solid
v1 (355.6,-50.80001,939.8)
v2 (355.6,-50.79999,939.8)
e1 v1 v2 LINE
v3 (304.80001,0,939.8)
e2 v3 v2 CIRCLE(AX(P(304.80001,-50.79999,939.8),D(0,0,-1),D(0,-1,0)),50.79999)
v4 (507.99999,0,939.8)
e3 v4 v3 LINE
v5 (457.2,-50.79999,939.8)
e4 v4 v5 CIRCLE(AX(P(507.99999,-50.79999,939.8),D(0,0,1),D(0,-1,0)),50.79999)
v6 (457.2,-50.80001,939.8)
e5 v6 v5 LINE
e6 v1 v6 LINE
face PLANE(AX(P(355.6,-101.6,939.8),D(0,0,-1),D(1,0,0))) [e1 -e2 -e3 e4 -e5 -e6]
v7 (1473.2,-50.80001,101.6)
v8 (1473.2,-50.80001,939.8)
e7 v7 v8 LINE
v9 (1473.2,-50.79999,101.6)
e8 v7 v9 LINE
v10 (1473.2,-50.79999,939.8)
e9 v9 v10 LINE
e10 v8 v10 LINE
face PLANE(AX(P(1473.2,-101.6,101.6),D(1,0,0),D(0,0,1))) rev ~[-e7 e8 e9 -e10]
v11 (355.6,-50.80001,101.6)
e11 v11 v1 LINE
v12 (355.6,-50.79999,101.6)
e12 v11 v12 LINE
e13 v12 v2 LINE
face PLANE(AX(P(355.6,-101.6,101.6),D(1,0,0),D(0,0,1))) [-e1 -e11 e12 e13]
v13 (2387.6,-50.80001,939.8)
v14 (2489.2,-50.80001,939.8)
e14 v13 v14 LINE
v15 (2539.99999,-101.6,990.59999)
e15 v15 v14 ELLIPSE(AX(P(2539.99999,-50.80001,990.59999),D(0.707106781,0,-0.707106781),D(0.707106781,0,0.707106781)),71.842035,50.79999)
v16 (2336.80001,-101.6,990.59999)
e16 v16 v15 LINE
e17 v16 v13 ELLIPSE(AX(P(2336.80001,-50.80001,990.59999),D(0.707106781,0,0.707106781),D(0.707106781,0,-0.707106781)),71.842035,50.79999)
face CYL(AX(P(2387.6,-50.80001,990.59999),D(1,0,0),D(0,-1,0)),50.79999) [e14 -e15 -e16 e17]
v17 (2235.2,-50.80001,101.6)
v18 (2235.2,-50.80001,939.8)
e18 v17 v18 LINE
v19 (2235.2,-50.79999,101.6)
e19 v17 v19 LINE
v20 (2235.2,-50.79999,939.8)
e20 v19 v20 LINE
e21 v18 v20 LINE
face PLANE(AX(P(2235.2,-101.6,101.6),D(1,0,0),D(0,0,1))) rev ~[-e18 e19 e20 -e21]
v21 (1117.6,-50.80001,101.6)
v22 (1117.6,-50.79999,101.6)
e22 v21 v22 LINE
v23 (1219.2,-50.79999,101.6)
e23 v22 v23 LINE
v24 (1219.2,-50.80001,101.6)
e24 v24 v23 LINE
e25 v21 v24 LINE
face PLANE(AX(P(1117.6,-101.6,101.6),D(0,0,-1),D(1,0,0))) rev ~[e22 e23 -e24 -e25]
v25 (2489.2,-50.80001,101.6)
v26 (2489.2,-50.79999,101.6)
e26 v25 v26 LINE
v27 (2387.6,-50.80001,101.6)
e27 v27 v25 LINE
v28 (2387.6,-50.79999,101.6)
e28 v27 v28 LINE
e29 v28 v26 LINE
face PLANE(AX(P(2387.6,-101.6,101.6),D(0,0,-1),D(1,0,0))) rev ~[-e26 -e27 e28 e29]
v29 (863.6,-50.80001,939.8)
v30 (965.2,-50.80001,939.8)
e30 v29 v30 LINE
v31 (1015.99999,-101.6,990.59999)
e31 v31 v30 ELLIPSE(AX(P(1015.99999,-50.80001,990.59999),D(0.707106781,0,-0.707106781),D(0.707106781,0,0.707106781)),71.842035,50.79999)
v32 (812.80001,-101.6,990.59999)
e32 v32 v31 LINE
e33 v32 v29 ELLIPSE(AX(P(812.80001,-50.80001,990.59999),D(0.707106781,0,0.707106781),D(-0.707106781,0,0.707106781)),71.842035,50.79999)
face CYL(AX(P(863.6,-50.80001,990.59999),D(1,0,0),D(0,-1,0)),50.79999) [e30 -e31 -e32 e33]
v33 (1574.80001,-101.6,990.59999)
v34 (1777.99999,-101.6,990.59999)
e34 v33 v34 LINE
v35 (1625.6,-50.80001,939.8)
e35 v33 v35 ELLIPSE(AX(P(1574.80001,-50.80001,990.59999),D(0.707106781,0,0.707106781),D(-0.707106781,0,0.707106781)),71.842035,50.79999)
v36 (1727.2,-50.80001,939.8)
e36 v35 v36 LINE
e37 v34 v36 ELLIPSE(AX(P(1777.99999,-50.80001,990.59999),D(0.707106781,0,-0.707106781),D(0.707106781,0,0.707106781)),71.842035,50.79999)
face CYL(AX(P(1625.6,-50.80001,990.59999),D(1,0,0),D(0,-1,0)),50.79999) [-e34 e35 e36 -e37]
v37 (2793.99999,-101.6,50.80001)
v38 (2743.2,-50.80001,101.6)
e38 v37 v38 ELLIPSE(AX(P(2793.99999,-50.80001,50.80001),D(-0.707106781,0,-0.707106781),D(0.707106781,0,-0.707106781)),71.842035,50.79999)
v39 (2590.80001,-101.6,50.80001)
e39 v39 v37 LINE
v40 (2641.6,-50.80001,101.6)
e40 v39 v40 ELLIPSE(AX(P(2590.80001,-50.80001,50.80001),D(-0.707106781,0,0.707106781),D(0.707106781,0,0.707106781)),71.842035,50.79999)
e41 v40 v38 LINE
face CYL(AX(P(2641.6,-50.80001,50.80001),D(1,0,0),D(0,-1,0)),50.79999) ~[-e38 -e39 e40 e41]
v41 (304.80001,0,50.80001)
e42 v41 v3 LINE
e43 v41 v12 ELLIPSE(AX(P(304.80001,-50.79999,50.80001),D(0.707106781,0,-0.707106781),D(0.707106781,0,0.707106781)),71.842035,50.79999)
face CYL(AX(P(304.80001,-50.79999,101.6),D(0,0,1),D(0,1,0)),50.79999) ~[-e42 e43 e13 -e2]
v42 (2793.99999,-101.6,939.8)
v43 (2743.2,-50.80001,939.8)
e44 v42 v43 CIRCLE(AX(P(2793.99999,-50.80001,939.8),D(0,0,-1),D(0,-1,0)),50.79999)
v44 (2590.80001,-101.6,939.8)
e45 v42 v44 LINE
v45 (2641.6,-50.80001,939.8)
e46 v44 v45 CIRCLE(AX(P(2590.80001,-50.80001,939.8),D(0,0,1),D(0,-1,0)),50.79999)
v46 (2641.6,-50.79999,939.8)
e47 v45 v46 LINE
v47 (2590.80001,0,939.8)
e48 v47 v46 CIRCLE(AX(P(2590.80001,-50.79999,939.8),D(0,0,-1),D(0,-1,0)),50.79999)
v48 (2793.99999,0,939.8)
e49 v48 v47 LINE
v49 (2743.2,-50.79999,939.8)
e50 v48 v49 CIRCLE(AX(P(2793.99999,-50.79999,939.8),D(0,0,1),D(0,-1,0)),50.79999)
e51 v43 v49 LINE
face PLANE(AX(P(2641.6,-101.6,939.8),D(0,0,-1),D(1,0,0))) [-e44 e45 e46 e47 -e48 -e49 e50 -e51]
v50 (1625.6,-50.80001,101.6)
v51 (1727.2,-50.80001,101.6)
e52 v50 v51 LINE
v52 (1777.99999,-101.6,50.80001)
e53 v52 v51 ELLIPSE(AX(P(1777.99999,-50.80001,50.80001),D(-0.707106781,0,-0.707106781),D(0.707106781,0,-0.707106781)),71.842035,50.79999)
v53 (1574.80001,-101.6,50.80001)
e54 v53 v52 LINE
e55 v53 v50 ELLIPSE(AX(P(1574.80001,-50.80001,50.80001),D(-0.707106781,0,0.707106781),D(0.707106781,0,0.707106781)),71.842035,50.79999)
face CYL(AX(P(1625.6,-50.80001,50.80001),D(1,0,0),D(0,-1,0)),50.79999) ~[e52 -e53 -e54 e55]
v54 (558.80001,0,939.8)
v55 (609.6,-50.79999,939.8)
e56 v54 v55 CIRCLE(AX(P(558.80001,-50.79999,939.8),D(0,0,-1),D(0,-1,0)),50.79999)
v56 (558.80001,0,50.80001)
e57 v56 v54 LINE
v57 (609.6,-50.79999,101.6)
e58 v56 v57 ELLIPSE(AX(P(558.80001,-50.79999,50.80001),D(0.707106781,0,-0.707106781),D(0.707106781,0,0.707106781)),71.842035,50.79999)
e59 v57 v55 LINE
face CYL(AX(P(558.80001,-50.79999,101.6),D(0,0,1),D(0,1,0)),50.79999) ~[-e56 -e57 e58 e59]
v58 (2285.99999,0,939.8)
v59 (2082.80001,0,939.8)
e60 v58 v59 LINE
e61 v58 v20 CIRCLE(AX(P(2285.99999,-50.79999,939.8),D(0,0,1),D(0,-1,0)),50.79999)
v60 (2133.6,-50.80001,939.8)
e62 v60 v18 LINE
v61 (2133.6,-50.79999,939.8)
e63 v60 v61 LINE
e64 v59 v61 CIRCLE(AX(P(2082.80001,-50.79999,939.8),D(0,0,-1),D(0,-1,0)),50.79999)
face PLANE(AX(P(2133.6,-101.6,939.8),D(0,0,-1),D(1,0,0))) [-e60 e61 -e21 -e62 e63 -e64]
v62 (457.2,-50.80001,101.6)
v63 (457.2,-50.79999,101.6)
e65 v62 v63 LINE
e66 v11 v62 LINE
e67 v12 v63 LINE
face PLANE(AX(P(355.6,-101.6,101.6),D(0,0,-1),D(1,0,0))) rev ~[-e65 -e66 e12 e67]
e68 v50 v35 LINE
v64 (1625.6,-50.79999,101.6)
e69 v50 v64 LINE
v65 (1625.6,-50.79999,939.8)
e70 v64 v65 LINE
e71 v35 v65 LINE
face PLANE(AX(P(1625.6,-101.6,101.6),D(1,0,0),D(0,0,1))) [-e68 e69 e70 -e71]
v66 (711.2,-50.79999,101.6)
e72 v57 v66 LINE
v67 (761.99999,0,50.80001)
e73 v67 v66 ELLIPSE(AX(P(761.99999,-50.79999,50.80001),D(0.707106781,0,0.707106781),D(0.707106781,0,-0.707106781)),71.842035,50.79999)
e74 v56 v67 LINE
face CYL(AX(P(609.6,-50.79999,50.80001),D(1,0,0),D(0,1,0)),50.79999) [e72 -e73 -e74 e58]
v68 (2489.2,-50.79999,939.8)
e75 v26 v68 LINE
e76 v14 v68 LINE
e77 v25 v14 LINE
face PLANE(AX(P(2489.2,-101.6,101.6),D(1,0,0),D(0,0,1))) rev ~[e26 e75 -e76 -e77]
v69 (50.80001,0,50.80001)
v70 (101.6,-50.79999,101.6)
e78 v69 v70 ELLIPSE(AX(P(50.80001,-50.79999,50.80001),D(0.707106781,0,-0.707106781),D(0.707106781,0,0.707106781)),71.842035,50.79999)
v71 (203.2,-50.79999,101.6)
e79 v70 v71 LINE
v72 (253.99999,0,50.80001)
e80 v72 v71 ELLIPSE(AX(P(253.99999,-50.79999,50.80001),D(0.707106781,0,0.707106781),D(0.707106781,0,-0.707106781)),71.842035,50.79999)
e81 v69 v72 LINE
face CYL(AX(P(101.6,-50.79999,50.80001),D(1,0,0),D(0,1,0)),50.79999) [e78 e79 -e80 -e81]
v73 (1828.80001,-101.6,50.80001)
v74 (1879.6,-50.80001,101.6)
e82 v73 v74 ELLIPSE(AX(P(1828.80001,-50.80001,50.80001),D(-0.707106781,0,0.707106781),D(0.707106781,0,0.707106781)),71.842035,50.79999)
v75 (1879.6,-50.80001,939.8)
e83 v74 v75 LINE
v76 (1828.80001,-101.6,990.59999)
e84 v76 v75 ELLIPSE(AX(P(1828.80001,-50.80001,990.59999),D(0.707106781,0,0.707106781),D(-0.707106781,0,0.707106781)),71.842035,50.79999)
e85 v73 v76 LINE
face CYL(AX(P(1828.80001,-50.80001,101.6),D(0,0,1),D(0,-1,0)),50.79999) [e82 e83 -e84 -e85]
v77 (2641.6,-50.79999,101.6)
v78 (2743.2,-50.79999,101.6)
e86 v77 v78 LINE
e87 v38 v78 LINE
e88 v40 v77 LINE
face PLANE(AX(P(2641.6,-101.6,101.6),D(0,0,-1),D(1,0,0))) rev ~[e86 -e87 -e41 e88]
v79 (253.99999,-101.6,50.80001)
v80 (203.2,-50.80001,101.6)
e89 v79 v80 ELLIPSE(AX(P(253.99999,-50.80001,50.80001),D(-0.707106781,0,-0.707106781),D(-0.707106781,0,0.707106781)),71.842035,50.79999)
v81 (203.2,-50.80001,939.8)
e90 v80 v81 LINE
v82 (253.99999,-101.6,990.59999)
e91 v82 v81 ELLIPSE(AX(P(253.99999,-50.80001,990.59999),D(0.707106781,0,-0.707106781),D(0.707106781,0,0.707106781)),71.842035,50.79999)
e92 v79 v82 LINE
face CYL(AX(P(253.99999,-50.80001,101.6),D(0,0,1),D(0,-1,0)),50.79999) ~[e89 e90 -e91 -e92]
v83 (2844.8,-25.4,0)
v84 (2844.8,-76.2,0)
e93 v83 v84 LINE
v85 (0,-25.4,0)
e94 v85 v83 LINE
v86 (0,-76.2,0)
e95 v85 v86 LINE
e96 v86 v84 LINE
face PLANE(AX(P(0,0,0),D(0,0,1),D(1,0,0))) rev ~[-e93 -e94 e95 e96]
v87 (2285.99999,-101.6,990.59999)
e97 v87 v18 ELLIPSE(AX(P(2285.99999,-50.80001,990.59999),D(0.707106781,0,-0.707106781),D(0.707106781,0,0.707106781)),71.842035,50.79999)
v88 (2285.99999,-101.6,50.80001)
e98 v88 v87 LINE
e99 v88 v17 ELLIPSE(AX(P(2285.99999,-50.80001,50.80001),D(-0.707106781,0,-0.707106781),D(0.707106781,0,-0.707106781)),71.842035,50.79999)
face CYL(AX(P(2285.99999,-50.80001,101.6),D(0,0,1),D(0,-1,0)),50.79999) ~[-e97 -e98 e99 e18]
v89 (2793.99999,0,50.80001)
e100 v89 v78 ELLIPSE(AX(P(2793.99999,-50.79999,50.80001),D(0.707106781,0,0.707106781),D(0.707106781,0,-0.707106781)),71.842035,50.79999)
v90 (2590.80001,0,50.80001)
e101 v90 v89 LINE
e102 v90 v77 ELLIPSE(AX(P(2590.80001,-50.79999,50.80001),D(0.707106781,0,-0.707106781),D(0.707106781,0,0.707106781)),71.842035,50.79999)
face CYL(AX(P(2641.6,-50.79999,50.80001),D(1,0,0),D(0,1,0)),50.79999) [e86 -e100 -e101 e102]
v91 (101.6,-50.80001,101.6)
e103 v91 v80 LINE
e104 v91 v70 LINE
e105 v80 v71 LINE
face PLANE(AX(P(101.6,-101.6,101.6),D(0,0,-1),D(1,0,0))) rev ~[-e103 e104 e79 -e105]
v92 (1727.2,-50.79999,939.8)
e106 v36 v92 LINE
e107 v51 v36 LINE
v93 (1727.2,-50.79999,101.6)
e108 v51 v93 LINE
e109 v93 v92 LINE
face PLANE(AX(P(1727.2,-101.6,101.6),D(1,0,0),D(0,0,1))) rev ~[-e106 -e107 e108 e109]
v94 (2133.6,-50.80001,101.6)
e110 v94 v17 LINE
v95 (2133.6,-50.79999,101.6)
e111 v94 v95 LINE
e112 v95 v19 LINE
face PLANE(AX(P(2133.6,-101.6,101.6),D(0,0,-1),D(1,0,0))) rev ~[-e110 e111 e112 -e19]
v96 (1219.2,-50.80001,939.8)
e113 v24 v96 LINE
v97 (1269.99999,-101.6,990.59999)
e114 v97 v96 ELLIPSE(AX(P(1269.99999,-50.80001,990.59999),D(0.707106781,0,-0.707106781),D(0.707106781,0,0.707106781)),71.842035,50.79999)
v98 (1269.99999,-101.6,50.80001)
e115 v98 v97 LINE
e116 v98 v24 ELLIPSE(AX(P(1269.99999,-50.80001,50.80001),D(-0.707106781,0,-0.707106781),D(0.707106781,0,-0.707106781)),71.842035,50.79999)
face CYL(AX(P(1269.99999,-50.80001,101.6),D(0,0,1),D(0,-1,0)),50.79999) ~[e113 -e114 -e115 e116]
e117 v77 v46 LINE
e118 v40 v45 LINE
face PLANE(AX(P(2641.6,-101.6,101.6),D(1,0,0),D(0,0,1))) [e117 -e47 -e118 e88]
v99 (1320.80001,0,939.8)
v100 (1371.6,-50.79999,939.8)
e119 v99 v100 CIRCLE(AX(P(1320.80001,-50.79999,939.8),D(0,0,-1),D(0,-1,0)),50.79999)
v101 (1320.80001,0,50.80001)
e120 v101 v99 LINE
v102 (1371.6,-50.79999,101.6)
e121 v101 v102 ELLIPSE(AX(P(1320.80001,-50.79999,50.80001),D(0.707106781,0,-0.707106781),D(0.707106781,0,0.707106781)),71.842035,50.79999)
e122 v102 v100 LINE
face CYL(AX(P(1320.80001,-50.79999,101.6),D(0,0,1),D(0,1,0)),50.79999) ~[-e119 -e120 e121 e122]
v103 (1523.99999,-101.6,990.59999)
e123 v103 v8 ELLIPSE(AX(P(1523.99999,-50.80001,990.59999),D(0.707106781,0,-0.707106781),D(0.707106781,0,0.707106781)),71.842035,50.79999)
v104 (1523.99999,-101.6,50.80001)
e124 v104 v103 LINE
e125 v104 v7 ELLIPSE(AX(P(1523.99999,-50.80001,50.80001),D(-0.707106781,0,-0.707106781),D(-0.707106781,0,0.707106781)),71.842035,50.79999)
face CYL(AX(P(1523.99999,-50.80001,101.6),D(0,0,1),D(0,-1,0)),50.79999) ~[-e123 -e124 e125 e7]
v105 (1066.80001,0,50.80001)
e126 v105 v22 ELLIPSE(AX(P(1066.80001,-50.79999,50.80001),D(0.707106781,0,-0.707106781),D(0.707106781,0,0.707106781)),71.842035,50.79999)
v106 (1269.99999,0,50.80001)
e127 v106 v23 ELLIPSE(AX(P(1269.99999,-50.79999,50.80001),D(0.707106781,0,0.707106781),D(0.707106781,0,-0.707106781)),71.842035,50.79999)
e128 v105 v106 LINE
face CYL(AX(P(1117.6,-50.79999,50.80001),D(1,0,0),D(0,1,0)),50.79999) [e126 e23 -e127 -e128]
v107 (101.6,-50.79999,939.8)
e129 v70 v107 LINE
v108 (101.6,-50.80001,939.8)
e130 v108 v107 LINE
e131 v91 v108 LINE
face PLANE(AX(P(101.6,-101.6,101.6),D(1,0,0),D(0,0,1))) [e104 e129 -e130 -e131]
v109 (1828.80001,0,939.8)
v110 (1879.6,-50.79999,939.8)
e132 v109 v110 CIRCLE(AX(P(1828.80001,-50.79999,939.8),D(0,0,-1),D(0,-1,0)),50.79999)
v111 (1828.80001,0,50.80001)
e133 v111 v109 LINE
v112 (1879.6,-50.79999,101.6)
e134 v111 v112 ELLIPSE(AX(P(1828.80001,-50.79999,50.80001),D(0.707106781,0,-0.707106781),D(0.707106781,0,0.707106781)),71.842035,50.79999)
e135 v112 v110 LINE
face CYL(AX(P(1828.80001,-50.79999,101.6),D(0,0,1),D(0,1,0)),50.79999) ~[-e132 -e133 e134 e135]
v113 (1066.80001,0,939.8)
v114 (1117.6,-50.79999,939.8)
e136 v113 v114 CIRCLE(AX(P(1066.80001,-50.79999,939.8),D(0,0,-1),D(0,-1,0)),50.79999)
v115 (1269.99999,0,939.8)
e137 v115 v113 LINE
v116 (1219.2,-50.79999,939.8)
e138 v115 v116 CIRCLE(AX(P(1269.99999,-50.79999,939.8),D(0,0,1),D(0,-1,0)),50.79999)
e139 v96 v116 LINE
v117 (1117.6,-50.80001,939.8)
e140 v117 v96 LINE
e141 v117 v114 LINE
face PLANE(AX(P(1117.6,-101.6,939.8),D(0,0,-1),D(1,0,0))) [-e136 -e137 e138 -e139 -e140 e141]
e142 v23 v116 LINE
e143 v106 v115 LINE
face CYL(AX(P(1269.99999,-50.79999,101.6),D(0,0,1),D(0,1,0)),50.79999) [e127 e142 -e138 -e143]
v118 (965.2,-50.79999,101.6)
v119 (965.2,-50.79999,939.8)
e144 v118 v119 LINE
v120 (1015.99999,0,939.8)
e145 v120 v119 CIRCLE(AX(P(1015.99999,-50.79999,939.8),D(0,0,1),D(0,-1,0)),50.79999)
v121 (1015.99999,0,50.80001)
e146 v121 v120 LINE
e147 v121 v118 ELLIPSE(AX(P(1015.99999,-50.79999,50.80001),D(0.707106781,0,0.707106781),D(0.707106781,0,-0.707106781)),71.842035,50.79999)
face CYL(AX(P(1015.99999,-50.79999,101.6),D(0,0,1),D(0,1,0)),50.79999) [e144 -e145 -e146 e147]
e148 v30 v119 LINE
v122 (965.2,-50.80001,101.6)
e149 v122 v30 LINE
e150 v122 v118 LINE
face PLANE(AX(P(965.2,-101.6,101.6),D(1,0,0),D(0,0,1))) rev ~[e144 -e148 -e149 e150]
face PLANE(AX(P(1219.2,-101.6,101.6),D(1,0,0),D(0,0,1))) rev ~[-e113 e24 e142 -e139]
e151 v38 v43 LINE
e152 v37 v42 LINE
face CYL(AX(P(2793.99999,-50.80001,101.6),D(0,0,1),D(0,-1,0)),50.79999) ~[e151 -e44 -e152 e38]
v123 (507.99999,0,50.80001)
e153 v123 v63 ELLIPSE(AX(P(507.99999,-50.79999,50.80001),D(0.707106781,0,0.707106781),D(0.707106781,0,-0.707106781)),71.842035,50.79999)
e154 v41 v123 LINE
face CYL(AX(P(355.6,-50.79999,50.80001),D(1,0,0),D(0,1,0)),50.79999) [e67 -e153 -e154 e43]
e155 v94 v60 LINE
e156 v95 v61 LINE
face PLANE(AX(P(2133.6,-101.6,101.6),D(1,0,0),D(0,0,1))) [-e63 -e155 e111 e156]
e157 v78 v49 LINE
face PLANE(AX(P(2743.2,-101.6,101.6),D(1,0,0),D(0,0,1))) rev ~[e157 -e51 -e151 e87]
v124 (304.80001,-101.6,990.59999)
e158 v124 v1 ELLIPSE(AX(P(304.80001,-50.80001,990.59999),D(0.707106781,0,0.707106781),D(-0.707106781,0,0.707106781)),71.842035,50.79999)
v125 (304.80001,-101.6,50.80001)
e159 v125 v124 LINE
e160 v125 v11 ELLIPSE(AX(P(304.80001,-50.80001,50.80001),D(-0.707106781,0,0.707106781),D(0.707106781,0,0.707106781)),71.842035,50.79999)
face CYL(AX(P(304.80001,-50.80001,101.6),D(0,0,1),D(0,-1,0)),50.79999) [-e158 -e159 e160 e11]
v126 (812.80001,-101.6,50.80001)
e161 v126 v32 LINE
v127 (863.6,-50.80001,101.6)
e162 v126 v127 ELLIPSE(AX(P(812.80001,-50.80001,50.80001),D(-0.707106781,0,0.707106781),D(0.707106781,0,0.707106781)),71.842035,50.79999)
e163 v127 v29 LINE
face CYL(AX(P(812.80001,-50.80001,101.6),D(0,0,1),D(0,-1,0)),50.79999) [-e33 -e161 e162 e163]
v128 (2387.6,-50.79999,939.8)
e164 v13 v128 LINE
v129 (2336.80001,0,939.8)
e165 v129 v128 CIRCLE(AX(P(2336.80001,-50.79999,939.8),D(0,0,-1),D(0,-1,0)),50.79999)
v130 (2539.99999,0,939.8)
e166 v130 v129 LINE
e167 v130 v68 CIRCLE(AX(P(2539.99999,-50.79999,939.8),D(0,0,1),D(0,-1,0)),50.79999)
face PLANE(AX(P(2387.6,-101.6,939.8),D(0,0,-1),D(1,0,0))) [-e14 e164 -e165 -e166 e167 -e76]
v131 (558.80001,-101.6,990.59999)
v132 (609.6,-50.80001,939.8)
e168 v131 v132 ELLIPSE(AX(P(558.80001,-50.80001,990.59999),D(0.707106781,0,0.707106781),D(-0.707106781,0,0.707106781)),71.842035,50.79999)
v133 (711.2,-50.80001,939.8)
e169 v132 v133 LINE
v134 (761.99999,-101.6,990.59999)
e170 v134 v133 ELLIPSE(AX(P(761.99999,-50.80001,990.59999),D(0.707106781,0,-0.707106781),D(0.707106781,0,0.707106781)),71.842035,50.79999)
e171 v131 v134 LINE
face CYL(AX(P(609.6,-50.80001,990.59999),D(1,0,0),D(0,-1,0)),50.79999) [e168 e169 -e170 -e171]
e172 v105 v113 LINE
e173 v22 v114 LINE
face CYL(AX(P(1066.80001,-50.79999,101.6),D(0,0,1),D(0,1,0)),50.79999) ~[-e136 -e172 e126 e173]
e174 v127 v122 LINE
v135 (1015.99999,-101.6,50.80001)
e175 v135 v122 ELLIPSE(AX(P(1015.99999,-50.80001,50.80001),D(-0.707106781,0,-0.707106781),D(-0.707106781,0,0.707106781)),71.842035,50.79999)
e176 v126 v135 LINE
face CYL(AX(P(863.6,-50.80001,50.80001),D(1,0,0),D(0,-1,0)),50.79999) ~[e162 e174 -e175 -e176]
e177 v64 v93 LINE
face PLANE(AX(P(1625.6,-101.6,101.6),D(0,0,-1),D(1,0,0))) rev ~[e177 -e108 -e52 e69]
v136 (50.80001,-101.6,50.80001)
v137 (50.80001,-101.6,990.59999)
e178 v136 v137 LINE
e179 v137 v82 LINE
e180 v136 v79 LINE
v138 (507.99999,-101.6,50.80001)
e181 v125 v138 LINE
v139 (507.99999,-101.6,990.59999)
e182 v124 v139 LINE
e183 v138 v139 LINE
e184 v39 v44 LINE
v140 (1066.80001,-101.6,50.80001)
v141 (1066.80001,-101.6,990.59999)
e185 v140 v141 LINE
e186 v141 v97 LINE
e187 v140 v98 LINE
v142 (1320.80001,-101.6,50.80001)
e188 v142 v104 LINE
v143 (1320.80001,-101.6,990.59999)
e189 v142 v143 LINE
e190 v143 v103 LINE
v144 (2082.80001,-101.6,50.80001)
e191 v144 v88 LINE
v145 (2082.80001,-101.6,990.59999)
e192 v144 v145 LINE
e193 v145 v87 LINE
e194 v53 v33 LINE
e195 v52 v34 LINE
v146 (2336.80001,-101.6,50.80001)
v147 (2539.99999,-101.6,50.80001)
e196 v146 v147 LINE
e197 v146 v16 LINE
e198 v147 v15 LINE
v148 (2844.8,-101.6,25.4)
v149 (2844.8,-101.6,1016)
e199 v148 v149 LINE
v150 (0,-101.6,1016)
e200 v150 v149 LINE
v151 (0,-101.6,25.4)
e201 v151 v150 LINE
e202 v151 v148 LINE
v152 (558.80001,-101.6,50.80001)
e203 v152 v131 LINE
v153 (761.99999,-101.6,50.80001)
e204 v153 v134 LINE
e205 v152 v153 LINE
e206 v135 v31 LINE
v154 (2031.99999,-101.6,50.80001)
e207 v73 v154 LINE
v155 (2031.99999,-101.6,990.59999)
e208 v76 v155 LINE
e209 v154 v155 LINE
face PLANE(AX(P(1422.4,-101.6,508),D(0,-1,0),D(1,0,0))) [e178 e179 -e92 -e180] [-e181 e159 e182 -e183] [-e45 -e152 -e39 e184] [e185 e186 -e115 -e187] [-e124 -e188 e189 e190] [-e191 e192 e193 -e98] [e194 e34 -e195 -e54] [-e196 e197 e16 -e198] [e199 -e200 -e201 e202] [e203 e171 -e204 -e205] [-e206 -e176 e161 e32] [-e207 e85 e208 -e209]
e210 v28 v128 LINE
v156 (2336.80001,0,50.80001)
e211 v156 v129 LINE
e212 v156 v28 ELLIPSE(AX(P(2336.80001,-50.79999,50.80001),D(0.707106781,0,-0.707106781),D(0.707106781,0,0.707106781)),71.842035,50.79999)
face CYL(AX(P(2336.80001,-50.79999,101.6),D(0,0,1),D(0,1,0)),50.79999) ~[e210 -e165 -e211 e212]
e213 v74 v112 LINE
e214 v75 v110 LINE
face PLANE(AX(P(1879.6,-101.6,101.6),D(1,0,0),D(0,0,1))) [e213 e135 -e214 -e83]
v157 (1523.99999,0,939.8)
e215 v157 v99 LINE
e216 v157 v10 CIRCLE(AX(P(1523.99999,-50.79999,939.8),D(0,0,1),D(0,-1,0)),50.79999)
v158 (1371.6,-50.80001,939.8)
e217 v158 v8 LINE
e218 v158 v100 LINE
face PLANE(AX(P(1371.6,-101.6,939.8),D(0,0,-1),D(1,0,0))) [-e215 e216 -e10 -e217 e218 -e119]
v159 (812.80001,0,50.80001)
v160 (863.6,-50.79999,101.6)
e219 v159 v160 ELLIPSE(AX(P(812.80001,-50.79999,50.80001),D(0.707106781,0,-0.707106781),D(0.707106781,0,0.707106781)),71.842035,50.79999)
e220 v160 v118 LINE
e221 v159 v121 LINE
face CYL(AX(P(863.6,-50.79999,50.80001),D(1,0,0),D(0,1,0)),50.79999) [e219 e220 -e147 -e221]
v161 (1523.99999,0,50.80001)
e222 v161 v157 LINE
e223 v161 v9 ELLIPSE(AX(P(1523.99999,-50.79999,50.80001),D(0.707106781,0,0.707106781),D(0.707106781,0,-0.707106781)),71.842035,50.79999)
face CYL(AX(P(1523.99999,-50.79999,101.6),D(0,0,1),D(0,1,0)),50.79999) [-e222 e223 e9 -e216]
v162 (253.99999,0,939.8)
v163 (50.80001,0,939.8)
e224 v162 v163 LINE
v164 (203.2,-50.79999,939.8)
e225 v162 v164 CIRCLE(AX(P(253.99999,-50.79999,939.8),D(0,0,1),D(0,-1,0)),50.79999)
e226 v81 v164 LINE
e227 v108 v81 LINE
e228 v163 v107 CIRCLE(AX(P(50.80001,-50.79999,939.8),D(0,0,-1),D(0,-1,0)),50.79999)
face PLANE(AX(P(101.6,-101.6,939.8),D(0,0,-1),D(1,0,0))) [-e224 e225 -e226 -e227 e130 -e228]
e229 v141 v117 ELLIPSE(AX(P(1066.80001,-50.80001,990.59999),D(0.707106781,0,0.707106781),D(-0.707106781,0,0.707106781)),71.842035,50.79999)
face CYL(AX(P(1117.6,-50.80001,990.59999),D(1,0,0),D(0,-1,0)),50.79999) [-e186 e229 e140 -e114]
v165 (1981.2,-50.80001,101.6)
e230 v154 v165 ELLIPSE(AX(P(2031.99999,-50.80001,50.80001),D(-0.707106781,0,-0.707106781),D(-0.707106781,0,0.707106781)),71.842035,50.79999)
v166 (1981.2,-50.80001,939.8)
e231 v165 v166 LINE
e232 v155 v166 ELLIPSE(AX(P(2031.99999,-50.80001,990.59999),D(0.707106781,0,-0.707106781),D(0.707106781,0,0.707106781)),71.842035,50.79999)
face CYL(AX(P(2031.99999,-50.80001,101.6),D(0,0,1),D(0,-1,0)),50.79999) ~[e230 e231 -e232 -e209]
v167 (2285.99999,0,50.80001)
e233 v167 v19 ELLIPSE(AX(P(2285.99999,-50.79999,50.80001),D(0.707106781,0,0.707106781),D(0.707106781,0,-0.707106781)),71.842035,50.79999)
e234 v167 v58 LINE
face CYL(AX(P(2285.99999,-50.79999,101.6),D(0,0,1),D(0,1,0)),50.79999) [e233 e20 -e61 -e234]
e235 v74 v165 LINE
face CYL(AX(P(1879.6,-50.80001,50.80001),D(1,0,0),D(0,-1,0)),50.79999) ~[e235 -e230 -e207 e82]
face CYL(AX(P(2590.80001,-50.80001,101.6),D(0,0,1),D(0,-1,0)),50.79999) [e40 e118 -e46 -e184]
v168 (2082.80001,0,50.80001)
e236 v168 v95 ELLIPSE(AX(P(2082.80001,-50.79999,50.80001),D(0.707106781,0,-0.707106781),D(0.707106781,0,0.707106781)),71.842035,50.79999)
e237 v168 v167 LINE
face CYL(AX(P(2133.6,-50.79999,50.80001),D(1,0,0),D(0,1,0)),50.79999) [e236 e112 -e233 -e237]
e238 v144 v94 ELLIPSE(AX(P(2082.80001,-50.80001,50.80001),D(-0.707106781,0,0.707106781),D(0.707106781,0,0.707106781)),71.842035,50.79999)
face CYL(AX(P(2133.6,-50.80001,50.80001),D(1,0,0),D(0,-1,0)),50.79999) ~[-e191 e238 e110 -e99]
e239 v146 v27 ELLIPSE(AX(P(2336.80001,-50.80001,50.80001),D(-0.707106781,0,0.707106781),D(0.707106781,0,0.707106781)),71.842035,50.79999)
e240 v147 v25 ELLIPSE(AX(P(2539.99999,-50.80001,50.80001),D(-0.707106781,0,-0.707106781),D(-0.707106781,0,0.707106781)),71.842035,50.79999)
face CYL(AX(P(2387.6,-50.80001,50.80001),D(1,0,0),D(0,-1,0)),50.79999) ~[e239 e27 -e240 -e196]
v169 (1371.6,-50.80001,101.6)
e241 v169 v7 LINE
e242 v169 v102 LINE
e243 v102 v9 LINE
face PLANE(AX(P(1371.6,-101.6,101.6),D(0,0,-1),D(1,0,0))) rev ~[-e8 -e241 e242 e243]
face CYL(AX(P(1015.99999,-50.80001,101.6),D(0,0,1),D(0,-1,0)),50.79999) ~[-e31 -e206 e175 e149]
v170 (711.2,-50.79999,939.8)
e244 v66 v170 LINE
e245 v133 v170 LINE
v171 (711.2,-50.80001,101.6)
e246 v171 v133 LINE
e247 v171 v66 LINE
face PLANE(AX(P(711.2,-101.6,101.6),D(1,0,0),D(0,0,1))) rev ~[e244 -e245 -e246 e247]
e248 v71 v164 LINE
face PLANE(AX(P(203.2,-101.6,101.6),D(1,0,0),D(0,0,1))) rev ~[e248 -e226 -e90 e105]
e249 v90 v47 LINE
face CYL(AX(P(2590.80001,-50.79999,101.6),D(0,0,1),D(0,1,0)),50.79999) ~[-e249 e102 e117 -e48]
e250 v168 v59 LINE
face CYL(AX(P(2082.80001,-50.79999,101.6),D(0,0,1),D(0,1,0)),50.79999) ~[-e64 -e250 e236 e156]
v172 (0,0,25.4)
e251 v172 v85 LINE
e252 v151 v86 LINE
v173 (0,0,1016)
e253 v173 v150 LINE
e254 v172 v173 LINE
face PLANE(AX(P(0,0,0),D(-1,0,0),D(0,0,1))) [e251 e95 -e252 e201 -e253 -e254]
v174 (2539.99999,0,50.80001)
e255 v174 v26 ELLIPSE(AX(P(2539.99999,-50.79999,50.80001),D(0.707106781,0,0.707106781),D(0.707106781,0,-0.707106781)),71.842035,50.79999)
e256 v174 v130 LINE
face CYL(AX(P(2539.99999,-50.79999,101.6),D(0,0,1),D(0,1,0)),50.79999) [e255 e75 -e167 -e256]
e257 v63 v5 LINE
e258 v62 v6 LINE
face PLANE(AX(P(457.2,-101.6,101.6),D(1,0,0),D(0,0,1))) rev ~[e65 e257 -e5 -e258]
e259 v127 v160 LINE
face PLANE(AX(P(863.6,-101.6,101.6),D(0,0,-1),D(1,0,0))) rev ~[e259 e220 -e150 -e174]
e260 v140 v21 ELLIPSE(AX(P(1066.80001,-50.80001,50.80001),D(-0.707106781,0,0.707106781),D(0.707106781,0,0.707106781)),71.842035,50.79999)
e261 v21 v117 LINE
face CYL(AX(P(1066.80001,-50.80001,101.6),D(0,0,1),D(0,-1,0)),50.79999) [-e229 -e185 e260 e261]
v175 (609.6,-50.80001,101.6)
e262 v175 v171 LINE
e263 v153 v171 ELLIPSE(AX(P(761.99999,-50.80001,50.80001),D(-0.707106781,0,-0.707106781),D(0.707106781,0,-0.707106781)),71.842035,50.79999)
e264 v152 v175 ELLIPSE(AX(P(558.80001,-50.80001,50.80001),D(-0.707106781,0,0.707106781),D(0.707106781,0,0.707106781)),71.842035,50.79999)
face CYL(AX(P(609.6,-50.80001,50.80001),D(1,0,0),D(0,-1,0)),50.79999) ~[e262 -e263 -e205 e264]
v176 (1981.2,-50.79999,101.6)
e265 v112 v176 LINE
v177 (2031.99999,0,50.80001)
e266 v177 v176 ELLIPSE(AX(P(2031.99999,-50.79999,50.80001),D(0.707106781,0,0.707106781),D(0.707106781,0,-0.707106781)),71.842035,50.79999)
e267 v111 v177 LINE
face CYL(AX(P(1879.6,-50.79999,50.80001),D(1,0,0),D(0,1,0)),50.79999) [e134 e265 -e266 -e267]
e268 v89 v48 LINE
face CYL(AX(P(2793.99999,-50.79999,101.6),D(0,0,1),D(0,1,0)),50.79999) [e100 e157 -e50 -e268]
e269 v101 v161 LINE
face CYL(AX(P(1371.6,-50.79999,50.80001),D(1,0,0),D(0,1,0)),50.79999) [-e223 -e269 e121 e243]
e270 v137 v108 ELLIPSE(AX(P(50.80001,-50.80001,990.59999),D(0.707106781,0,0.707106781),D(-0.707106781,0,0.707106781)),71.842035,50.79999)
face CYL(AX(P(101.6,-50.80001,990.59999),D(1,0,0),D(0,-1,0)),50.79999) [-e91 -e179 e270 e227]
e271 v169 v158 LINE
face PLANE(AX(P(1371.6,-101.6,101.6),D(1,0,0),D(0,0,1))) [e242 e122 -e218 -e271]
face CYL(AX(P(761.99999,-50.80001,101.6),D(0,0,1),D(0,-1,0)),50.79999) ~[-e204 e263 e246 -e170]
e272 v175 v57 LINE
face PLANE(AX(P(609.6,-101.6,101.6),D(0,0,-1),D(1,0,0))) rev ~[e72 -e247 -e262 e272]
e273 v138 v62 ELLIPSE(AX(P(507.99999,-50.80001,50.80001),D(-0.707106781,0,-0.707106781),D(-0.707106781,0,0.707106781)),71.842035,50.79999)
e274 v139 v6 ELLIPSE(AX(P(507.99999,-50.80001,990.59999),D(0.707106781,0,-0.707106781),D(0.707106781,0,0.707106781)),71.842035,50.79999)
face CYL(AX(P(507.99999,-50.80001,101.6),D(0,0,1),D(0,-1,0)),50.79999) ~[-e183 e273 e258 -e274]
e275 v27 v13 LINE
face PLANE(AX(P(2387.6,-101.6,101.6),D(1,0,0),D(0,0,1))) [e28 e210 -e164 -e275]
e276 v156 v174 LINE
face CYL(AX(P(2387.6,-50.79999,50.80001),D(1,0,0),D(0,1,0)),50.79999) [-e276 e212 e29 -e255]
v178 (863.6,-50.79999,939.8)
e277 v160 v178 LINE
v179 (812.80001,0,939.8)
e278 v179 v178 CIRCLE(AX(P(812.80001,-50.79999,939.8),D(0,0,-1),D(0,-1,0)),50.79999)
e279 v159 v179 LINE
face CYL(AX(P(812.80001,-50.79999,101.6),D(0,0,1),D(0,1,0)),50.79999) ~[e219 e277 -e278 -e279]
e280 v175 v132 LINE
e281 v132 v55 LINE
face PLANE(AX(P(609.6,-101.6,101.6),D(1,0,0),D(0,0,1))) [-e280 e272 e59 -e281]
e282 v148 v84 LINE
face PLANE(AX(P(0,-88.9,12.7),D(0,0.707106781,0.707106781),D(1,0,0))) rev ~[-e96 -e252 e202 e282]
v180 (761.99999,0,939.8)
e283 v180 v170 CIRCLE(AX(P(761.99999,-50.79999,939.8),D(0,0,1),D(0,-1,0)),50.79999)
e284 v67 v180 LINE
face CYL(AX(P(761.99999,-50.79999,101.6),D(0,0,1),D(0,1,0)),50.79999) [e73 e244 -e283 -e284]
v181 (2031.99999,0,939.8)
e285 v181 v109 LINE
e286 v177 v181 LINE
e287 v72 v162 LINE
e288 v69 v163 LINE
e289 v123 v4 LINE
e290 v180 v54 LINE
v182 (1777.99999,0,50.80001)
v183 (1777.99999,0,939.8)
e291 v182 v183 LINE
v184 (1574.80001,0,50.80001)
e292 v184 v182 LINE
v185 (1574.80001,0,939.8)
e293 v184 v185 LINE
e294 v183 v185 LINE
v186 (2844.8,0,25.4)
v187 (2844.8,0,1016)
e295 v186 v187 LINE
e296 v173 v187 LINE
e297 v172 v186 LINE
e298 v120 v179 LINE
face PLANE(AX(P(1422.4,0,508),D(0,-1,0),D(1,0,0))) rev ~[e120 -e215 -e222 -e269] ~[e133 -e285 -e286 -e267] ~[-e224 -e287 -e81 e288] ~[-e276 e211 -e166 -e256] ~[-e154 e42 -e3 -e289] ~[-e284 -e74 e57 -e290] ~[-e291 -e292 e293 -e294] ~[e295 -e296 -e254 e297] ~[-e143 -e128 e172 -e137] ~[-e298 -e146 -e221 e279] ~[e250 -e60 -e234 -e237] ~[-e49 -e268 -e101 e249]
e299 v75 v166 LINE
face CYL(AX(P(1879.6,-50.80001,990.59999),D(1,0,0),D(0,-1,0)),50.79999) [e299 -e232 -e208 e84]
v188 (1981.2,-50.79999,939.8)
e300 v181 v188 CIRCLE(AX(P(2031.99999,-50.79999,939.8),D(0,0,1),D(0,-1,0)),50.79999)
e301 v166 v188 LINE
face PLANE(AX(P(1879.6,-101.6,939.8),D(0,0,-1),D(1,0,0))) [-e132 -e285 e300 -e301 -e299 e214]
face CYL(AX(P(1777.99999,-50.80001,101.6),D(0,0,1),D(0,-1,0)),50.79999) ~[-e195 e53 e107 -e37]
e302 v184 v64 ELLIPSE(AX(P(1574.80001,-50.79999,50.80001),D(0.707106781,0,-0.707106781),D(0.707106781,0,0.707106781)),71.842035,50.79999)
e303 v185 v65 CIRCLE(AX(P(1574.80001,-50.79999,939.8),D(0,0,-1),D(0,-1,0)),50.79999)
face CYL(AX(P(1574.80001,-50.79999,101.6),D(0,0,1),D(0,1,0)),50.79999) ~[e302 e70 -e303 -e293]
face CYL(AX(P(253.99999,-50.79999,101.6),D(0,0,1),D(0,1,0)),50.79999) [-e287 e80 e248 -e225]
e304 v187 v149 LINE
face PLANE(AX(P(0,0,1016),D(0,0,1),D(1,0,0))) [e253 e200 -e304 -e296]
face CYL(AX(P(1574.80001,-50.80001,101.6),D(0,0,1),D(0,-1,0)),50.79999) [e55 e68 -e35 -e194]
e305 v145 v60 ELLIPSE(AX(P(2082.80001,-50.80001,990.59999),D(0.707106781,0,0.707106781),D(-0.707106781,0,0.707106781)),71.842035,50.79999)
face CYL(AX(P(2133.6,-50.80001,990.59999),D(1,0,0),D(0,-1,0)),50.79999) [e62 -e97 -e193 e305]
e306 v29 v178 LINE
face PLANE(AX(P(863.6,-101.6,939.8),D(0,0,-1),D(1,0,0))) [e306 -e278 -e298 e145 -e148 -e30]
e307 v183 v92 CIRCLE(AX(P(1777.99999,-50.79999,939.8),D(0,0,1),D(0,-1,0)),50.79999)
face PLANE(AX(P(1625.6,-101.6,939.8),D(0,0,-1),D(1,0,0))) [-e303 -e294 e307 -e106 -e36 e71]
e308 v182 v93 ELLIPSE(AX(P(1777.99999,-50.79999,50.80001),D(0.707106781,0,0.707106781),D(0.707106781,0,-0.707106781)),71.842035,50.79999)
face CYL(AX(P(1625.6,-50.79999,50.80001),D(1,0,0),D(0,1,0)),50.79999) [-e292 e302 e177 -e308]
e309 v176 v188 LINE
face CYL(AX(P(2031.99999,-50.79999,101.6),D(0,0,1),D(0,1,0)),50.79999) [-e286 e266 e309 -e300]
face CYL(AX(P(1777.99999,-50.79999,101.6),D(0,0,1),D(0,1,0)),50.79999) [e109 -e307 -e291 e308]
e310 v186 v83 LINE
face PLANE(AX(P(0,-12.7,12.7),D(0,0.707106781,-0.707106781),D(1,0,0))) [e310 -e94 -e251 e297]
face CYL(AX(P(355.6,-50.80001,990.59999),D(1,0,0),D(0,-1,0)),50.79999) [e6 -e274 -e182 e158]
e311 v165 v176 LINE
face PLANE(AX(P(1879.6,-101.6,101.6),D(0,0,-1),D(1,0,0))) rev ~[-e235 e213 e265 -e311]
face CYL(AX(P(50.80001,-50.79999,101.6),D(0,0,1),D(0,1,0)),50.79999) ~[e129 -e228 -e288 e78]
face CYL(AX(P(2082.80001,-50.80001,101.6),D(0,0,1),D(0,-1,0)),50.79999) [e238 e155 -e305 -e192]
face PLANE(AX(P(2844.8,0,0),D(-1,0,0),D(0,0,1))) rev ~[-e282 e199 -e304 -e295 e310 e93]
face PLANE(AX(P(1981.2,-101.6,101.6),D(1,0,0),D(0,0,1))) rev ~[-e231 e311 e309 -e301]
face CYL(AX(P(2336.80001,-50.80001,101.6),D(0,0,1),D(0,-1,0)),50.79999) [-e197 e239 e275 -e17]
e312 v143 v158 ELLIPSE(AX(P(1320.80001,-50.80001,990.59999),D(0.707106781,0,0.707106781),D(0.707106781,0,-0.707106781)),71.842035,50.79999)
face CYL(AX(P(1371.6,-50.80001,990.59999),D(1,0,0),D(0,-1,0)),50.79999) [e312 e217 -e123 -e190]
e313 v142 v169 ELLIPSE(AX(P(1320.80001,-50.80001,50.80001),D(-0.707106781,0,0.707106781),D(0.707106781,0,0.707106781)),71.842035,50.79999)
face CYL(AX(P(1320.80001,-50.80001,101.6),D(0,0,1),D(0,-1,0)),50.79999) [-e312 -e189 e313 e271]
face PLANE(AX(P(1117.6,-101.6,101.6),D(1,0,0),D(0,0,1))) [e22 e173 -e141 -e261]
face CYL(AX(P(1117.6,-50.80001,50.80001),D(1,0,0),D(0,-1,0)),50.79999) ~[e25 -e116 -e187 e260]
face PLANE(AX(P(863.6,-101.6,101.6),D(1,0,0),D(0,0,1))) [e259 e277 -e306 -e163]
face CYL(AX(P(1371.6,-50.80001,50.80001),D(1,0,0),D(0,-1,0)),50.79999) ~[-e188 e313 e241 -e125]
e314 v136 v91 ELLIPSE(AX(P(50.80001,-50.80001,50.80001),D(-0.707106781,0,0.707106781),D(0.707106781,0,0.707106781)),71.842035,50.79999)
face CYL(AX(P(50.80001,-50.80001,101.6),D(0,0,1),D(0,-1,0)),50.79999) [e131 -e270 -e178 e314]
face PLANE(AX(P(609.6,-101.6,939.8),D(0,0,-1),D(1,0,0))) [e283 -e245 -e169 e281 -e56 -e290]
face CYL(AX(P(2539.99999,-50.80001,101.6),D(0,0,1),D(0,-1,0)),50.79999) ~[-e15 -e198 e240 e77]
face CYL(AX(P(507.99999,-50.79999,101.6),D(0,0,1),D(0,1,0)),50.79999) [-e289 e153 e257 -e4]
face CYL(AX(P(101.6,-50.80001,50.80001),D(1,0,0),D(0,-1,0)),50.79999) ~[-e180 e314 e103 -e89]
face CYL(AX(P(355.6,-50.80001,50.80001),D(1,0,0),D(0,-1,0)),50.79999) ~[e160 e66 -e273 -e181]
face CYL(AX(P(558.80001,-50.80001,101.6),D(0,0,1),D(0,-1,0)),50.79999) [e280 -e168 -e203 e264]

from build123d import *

# Parameters (mm, degrees)
F0_W     = 2844.8
F0_H     = 1016
F1_DEPTH = 101.6
F2_W     = 101.6
F2_H     = 838.2
F3_DEPTH = 307.34
F4_R     = 50.79999
F5_SIZE  = 25.4


# Not quite as in the source:
# - a fillet or chamfer is up to 0.001 mm smaller than in the source, because OpenCascade refuses the exact size


with BuildPart() as f1:
    # F0 (on Front) → F1 (new body)
    with BuildSketch(Plane.XZ):
        with Locations((1422.4, 508)):
            Rectangle(F0_W, F0_H)
    extrude(amount=F1_DEPTH)

    # F2 (on face) → F3 (cut)
    with BuildSketch(Plane.XZ.offset(101.6)):
        with Locations((152.4, 520.7)):
            Rectangle(F2_W, F2_H)
        with Locations((406.4, 520.7)):
            Rectangle(F2_W, F2_H)
        with Locations((660.4, 520.7)):
            Rectangle(F2_W, F2_H)
        with Locations((914.4, 520.7)):
            Rectangle(F2_W, F2_H)
        with Locations((1168.4, 520.7)):
            Rectangle(F2_W, F2_H)
        with Locations((1422.4, 520.7)):
            Rectangle(F2_W, F2_H)
        with Locations((1676.4, 520.7)):
            Rectangle(F2_W, F2_H)
        with Locations((1930.4, 520.7)):
            Rectangle(F2_W, F2_H)
        with Locations((2184.4, 520.7)):
            Rectangle(F2_W, F2_H)
        with Locations((2438.4, 520.7)):
            Rectangle(F2_W, F2_H)
        with Locations((2692.4, 520.7)):
            Rectangle(F2_W, F2_H)
    extrude(amount=-F3_DEPTH, mode=Mode.SUBTRACT)

    # F4 (radius 50.8 in the source; OpenCascade refuses exactly that, so slightly less here)
    f4_edges = [f1.edges().sort_by_distance(p)[0] for p in [
        (101.6, -101.6, 520.7),
        (152.4, -101.6, 939.8),
        (203.2, -101.6, 520.7),
        (152.4, -101.6, 101.6),
        (355.6, -101.6, 520.7),
        (406.4, -101.6, 939.8),
        (457.2, -101.6, 520.7),
        (406.4, -101.6, 101.6),
        (609.6, -101.6, 520.7),
        (660.4, -101.6, 101.6),
        (711.2, -101.6, 520.7),
        (660.4, -101.6, 939.8),
        (863.6, -101.6, 520.7),
        (914.4, -101.6, 939.8),
        (965.2, -101.6, 520.7),
        (914.4, -101.6, 101.6),
        (1117.6, -101.6, 520.7),
        (1168.4, -101.6, 101.6),
        (1219.2, -101.6, 520.7),
        (1168.4, -101.6, 939.8),
        (1422.4, -101.6, 939.8),
        (1371.6, -101.6, 520.7),
        (1473.2, -101.6, 520.7),
        (1422.4, -101.6, 101.6),
        (1676.4, -101.6, 101.6),
        (1625.6, -101.6, 520.7),
        (1727.2, -101.6, 520.7),
        (1676.4, -101.6, 939.8),
        (1879.6, -101.6, 520.7),
        (1930.4, -101.6, 939.8),
        (1981.2, -101.6, 520.7),
        (1930.4, -101.6, 101.6),
        (2184.4, -101.6, 101.6),
        (2133.6, -101.6, 520.7),
        (2235.2, -101.6, 520.7),
        (2184.4, -101.6, 939.8),
        (2438.4, -101.6, 939.8),
        (2387.6, -101.6, 520.7),
        (2489.2, -101.6, 520.7),
        (2438.4, -101.6, 101.6),
        (2641.6, -101.6, 520.7),
        (2692.4, -101.6, 101.6),
        (2743.2, -101.6, 520.7),
        (152.4, 0, 101.6),
        (101.6, 0, 520.7),
        (203.2, 0, 520.7),
        (355.6, 0, 520.7),
        (406.4, 0, 101.6),
        (457.2, 0, 520.7),
        (609.6, 0, 520.7),
        (660.4, 0, 101.6),
        (711.2, 0, 520.7),
        (863.6, 0, 520.7),
        (914.4, 0, 101.6),
        (965.2, 0, 520.7),
        (1117.6, 0, 520.7),
        (1168.4, 0, 101.6),
        (1219.2, 0, 520.7),
        (1422.4, 0, 101.6),
        (1473.2, 0, 520.7),
        (1371.6, 0, 520.7),
        (1625.6, 0, 520.7),
        (1676.4, 0, 101.6),
        (1727.2, 0, 520.7),
        (1879.6, 0, 520.7),
        (1930.4, 0, 101.6),
        (1981.2, 0, 520.7),
        (2133.6, 0, 520.7),
        (2184.4, 0, 101.6),
        (2235.2, 0, 520.7),
        (2387.6, 0, 520.7),
        (2438.4, 0, 101.6),
        (2489.2, 0, 520.7),
        (2641.6, 0, 520.7),
        (2692.4, 0, 101.6),
        (2743.2, 0, 520.7),
    ]]
    fillet(f4_edges, radius=F4_R)

    # F5
    f5_edges = [f1.edges().sort_by_distance(p)[0] for p in [
        (1422.4, 0, 0),
        (1422.4, -101.6, 0),
    ]]
    chamfer(f5_edges, length=F5_SIZE)


solid = f1.part
